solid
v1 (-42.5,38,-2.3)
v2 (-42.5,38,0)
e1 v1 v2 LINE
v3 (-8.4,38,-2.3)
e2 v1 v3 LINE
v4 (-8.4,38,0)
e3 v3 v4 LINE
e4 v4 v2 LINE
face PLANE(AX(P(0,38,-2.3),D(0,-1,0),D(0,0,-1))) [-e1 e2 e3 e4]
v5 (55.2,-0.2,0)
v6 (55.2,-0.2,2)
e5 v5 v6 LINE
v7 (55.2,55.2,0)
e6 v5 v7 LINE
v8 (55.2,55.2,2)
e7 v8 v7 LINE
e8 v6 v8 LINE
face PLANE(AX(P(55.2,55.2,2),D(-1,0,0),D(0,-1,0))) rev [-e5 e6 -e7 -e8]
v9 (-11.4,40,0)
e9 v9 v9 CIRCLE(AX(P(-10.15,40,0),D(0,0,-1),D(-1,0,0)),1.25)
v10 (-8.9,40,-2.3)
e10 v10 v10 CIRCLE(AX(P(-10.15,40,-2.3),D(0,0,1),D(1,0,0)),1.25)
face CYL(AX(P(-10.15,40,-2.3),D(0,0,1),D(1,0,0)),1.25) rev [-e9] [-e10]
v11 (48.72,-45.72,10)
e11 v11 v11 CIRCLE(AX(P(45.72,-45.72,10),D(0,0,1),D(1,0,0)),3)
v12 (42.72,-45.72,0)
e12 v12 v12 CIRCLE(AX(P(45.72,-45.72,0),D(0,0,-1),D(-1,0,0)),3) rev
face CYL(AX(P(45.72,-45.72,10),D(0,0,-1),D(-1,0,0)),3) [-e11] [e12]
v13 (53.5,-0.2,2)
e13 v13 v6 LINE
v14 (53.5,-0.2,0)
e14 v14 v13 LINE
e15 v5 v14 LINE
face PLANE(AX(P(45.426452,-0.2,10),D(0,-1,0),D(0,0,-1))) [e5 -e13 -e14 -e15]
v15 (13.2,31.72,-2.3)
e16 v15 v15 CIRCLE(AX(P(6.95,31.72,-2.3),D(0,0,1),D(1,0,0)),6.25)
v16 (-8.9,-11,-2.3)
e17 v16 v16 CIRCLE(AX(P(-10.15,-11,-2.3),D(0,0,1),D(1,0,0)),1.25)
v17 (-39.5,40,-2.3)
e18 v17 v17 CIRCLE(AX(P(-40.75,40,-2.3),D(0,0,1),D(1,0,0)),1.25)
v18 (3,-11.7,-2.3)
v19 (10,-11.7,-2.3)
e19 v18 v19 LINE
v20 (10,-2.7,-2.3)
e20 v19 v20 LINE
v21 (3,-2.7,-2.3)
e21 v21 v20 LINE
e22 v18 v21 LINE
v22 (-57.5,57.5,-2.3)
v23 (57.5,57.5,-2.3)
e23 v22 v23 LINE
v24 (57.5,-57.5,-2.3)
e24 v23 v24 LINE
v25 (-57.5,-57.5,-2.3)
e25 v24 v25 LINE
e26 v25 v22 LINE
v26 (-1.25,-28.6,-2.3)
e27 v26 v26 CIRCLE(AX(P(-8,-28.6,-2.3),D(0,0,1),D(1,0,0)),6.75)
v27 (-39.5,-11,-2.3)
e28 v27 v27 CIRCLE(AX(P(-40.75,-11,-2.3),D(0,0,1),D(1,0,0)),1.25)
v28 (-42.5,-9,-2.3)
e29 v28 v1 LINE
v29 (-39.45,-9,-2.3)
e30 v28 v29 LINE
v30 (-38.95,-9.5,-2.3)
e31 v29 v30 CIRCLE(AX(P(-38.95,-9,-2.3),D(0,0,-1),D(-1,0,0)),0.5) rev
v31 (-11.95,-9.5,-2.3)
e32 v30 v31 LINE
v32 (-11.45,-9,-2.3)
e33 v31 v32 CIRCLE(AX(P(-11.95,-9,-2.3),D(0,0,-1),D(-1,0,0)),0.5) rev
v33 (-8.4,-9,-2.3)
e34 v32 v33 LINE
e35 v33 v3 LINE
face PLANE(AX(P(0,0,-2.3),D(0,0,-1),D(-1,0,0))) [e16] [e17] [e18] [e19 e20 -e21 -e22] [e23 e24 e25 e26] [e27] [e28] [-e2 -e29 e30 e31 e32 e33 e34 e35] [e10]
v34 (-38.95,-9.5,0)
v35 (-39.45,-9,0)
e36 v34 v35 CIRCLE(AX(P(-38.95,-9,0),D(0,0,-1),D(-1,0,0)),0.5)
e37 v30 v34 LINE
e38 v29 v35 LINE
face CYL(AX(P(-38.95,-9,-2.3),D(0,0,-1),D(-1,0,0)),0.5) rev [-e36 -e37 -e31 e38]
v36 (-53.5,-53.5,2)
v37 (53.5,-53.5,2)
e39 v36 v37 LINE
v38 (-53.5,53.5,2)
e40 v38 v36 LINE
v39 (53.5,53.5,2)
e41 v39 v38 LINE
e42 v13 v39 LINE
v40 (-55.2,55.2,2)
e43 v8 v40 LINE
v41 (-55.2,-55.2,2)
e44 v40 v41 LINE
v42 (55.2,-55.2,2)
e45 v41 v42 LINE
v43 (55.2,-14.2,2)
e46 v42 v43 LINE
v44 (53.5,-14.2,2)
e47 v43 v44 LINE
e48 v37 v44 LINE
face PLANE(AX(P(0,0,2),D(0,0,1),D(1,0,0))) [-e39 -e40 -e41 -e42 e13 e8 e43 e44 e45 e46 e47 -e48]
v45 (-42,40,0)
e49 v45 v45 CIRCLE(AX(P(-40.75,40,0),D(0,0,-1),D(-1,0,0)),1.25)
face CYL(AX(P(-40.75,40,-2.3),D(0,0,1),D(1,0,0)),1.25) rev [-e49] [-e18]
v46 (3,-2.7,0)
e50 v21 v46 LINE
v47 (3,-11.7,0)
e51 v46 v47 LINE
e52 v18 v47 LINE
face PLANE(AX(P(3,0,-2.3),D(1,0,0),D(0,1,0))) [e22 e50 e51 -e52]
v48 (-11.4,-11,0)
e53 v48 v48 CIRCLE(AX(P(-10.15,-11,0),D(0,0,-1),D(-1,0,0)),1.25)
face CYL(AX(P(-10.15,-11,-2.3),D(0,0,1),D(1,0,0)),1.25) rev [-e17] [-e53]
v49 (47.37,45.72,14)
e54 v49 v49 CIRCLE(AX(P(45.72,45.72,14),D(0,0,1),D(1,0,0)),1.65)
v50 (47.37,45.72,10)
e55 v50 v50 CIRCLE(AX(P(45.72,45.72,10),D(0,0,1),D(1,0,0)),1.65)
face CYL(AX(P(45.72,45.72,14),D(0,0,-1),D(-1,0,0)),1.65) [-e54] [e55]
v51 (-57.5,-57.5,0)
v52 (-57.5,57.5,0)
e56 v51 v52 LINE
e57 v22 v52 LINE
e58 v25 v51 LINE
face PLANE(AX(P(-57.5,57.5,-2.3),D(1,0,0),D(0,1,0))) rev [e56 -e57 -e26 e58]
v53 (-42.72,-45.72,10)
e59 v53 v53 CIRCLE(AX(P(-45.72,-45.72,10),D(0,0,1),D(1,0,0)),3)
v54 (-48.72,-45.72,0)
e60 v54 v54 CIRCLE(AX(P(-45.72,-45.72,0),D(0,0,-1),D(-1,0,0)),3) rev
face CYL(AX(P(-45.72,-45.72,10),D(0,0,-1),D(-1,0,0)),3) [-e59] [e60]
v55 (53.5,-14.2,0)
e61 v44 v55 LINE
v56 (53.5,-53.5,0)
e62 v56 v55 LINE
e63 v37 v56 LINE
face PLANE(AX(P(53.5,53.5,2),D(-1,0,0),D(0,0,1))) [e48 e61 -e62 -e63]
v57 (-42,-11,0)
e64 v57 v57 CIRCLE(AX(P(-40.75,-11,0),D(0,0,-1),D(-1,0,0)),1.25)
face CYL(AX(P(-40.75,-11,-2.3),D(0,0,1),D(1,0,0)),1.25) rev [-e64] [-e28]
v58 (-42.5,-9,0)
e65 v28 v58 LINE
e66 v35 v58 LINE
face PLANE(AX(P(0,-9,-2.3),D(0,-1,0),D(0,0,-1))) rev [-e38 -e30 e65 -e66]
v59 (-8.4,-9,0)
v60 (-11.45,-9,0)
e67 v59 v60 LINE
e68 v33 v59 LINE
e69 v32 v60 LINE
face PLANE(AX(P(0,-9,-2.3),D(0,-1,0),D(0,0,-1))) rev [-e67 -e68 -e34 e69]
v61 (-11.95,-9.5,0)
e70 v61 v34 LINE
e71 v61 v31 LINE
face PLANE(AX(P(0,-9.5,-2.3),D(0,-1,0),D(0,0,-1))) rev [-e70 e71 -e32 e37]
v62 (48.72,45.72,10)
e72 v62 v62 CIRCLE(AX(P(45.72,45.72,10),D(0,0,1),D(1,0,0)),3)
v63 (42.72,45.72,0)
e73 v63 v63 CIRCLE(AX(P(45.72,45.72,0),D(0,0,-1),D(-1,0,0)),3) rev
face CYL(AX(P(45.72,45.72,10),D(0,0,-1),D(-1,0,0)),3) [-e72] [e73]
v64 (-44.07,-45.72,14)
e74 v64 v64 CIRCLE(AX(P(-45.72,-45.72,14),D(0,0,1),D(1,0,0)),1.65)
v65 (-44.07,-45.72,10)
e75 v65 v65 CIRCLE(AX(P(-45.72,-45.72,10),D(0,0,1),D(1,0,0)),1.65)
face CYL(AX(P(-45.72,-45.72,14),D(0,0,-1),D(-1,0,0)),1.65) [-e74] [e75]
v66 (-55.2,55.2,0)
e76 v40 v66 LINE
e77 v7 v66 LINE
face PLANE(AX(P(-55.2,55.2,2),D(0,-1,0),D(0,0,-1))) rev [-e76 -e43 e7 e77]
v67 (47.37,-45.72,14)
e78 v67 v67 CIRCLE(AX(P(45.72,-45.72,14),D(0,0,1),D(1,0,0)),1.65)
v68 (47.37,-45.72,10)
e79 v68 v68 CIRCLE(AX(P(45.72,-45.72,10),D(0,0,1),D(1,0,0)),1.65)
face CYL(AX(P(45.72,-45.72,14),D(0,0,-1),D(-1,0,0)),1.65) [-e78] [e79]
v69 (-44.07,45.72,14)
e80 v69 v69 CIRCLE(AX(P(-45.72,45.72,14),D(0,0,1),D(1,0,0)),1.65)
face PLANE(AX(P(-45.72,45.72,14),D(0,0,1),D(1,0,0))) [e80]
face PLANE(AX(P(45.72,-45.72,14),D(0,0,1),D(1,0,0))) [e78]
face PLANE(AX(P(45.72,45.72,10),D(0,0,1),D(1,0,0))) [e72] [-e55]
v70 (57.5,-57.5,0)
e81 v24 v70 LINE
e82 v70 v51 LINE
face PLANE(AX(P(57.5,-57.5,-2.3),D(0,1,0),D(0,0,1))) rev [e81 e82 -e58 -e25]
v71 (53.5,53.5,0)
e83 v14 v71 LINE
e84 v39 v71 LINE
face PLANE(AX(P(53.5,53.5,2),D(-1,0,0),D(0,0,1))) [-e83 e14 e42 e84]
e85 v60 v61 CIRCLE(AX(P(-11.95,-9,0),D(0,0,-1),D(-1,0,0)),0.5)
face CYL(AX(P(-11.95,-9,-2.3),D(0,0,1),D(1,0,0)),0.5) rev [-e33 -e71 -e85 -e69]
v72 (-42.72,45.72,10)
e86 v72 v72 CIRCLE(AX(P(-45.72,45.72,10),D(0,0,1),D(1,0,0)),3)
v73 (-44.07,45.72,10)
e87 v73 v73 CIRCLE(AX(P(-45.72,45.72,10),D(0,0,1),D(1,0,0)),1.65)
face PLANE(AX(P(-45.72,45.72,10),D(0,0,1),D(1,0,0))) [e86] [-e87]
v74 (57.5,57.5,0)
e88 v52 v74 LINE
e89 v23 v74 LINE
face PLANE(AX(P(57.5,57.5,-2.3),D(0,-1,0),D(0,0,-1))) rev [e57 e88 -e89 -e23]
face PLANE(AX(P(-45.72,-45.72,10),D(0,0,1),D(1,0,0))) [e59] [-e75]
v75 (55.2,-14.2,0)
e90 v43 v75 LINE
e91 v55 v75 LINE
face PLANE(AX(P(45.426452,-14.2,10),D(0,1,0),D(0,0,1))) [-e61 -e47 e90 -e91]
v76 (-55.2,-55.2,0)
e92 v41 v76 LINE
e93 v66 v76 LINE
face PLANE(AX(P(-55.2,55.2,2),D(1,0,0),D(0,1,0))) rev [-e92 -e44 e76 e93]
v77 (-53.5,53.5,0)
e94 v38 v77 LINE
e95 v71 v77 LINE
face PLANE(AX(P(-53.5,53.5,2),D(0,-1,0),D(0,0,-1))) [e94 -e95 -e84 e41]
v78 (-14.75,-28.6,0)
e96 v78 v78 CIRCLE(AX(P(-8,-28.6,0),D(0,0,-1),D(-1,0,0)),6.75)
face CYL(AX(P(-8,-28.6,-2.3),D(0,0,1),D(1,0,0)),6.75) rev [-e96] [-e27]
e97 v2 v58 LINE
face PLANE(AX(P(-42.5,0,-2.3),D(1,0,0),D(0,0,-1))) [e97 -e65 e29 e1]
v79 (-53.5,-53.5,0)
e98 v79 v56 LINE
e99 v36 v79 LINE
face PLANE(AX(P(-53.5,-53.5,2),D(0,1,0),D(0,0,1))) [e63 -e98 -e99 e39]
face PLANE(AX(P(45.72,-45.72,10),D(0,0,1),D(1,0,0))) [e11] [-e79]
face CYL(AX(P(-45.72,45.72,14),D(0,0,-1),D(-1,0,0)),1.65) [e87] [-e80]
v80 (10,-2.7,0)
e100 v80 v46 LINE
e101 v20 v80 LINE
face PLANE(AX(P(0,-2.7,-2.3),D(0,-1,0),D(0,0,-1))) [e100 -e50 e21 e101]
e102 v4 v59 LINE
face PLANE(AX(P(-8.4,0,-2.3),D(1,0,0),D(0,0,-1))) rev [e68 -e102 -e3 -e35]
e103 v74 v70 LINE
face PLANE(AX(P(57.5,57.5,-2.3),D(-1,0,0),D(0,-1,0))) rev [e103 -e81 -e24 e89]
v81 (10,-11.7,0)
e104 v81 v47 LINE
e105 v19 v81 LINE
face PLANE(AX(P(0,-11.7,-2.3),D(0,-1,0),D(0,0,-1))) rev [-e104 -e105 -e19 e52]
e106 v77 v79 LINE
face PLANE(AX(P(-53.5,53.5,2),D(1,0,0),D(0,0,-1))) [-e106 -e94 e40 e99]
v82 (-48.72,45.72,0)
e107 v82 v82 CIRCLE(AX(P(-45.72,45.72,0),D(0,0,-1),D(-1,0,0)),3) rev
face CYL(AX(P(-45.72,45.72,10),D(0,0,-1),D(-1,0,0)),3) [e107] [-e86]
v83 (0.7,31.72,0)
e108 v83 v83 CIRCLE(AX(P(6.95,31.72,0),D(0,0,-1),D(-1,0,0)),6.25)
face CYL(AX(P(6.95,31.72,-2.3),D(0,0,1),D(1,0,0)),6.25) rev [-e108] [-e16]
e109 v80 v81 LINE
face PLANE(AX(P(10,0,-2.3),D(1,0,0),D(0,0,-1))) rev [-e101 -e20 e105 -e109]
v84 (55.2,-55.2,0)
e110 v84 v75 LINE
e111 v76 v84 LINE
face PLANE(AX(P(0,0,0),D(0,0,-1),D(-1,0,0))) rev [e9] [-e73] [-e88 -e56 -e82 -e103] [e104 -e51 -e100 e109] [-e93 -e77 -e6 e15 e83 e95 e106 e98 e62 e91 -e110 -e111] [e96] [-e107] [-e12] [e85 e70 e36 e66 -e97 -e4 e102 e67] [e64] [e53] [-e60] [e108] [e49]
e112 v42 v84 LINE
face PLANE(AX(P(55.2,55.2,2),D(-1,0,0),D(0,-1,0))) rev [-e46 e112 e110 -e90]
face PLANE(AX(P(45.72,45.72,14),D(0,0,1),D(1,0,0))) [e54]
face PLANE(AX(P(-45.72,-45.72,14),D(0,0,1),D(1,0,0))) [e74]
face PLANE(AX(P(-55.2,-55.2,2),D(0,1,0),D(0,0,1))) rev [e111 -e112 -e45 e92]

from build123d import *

# Parameters (mm, degrees)
SKETCH1_W               = 110.4
SKETCH1_H               = 110.4
SKETCH1_W_2             = 107
SKETCH1_H_2             = 107
BOSS_EXTRUDE1_DEPTH     = 2
SKETCH3_W               = 115
SKETCH3_H               = 115
BOSS_EXTRUDE2_DEPTH     = 2.3
SKETCH4_R               = 3
BOSS_EXTRUDE3_DEPTH     = 10
CUT_EXTRUDE2_DEPTH      = 82.929848041
CUT_EXTRUDE2_DEPTH_BACK = 82.929848041
SKETCH5_R               = 6.75
SKETCH5_R_2             = 6.25
SKETCH5_R_3             = 1.25
SKETCH5_W               = 7
SKETCH5_H               = 9
SKETCH5_W_2             = 34.1
SKETCH5_H_2             = 47
SKETCH5_W_3             = 28
SKETCH5_H_3             = 1
SKETCH6_R               = 1.65
BOSS_EXTRUDE4_DEPTH     = 4
SKETCH7_W               = 24.147095738
SKETCH7_H               = 14
CUT_EXTRUDE4_DEPTH      = 10
FILLET1_R               = 0.5


with BuildPart() as part:
    # Sketch1 → Boss-Extrude1 (new body)
    with BuildSketch(Plane.XY):
        Rectangle(SKETCH1_W, SKETCH1_H)
        Rectangle(SKETCH1_W_2, SKETCH1_H_2, mode=Mode.SUBTRACT)
    extrude(amount=BOSS_EXTRUDE1_DEPTH)

    # Sketch3 → Boss-Extrude2 (add)
    with BuildSketch(Plane(origin=(0, 0, 0), x_dir=(-1, 0, 0), z_dir=(0, 0, -1))):
        Rectangle(SKETCH3_W, SKETCH3_H)
    extrude(amount=BOSS_EXTRUDE2_DEPTH)

    # Sketch4 → Boss-Extrude3 (add)
    with BuildSketch(Plane.XY):
        with Locations(Location((-45.72, 45.72, 0), (0, 0, 180))):
            Circle(SKETCH4_R)
        with Locations(Location((45.72, 45.72, 0), (0, 0, 180))):
            Circle(SKETCH4_R)
        with Locations(Location((45.72, -45.72, 0), (0, 0, 180))):
            Circle(SKETCH4_R)
        with Locations(Location((-45.72, -45.72, 0), (0, 0, 180))):
            Circle(SKETCH4_R)
    extrude(amount=BOSS_EXTRUDE3_DEPTH)

    # Sketch5 → Cut-Extrude2 (cut, two sides: drawn at the far end of the back side and taken through both)
    with BuildSketch(Plane.XY.offset(-CUT_EXTRUDE2_DEPTH_BACK)):
        with Locations((-8, -28.6)):
            Circle(SKETCH5_R)
        with Locations((6.95, 31.72)):
            Circle(SKETCH5_R_2)
        with Locations((-40.75, -11)):
            Circle(SKETCH5_R_3)
        with Locations((-10.15, -11)):
            Circle(SKETCH5_R_3)
        with Locations((-10.15, 40)):
            Circle(SKETCH5_R_3)
        with Locations((-40.75, 40)):
            Circle(SKETCH5_R_3)
        with Locations((6.5, -7.2)):
            Rectangle(SKETCH5_W, SKETCH5_H)
        with Locations((-25.45, 14.5)):
            Rectangle(SKETCH5_W_2, SKETCH5_H_2)
        with Locations((-25.45, -9)):
            Rectangle(SKETCH5_W_3, SKETCH5_H_3)
    extrude(amount=CUT_EXTRUDE2_DEPTH + CUT_EXTRUDE2_DEPTH_BACK, mode=Mode.SUBTRACT)

    # Sketch6 → Boss-Extrude4 (add)
    with BuildSketch(Plane.XY.offset(10)):
        with Locations((-45.72, 45.72)):
            Circle(SKETCH6_R)
        with Locations((45.72, 45.72)):
            Circle(SKETCH6_R)
        with Locations((45.72, -45.72)):
            Circle(SKETCH6_R)
        with Locations((-45.72, -45.72)):
            Circle(SKETCH6_R)
    extrude(amount=BOSS_EXTRUDE4_DEPTH)

    # Sketch7 → Cut-Extrude4 (cut)
    with BuildSketch(Plane.XY):
        with Locations((57.5, -7.2)):
            Rectangle(SKETCH7_W, SKETCH7_H)
    extrude(amount=CUT_EXTRUDE4_DEPTH, mode=Mode.SUBTRACT)

    # Fillet1
    fillet1_edges = [part.edges().sort_by_distance(p)[0] for p in [
        (-11.45, -9.5, -1.15),
        (-39.45, -9.5, -1.15),
    ]]
    fillet(fillet1_edges, radius=FILLET1_R - 0.0001)  # a hair under: the kernel refuses the full size


solid = part.part
